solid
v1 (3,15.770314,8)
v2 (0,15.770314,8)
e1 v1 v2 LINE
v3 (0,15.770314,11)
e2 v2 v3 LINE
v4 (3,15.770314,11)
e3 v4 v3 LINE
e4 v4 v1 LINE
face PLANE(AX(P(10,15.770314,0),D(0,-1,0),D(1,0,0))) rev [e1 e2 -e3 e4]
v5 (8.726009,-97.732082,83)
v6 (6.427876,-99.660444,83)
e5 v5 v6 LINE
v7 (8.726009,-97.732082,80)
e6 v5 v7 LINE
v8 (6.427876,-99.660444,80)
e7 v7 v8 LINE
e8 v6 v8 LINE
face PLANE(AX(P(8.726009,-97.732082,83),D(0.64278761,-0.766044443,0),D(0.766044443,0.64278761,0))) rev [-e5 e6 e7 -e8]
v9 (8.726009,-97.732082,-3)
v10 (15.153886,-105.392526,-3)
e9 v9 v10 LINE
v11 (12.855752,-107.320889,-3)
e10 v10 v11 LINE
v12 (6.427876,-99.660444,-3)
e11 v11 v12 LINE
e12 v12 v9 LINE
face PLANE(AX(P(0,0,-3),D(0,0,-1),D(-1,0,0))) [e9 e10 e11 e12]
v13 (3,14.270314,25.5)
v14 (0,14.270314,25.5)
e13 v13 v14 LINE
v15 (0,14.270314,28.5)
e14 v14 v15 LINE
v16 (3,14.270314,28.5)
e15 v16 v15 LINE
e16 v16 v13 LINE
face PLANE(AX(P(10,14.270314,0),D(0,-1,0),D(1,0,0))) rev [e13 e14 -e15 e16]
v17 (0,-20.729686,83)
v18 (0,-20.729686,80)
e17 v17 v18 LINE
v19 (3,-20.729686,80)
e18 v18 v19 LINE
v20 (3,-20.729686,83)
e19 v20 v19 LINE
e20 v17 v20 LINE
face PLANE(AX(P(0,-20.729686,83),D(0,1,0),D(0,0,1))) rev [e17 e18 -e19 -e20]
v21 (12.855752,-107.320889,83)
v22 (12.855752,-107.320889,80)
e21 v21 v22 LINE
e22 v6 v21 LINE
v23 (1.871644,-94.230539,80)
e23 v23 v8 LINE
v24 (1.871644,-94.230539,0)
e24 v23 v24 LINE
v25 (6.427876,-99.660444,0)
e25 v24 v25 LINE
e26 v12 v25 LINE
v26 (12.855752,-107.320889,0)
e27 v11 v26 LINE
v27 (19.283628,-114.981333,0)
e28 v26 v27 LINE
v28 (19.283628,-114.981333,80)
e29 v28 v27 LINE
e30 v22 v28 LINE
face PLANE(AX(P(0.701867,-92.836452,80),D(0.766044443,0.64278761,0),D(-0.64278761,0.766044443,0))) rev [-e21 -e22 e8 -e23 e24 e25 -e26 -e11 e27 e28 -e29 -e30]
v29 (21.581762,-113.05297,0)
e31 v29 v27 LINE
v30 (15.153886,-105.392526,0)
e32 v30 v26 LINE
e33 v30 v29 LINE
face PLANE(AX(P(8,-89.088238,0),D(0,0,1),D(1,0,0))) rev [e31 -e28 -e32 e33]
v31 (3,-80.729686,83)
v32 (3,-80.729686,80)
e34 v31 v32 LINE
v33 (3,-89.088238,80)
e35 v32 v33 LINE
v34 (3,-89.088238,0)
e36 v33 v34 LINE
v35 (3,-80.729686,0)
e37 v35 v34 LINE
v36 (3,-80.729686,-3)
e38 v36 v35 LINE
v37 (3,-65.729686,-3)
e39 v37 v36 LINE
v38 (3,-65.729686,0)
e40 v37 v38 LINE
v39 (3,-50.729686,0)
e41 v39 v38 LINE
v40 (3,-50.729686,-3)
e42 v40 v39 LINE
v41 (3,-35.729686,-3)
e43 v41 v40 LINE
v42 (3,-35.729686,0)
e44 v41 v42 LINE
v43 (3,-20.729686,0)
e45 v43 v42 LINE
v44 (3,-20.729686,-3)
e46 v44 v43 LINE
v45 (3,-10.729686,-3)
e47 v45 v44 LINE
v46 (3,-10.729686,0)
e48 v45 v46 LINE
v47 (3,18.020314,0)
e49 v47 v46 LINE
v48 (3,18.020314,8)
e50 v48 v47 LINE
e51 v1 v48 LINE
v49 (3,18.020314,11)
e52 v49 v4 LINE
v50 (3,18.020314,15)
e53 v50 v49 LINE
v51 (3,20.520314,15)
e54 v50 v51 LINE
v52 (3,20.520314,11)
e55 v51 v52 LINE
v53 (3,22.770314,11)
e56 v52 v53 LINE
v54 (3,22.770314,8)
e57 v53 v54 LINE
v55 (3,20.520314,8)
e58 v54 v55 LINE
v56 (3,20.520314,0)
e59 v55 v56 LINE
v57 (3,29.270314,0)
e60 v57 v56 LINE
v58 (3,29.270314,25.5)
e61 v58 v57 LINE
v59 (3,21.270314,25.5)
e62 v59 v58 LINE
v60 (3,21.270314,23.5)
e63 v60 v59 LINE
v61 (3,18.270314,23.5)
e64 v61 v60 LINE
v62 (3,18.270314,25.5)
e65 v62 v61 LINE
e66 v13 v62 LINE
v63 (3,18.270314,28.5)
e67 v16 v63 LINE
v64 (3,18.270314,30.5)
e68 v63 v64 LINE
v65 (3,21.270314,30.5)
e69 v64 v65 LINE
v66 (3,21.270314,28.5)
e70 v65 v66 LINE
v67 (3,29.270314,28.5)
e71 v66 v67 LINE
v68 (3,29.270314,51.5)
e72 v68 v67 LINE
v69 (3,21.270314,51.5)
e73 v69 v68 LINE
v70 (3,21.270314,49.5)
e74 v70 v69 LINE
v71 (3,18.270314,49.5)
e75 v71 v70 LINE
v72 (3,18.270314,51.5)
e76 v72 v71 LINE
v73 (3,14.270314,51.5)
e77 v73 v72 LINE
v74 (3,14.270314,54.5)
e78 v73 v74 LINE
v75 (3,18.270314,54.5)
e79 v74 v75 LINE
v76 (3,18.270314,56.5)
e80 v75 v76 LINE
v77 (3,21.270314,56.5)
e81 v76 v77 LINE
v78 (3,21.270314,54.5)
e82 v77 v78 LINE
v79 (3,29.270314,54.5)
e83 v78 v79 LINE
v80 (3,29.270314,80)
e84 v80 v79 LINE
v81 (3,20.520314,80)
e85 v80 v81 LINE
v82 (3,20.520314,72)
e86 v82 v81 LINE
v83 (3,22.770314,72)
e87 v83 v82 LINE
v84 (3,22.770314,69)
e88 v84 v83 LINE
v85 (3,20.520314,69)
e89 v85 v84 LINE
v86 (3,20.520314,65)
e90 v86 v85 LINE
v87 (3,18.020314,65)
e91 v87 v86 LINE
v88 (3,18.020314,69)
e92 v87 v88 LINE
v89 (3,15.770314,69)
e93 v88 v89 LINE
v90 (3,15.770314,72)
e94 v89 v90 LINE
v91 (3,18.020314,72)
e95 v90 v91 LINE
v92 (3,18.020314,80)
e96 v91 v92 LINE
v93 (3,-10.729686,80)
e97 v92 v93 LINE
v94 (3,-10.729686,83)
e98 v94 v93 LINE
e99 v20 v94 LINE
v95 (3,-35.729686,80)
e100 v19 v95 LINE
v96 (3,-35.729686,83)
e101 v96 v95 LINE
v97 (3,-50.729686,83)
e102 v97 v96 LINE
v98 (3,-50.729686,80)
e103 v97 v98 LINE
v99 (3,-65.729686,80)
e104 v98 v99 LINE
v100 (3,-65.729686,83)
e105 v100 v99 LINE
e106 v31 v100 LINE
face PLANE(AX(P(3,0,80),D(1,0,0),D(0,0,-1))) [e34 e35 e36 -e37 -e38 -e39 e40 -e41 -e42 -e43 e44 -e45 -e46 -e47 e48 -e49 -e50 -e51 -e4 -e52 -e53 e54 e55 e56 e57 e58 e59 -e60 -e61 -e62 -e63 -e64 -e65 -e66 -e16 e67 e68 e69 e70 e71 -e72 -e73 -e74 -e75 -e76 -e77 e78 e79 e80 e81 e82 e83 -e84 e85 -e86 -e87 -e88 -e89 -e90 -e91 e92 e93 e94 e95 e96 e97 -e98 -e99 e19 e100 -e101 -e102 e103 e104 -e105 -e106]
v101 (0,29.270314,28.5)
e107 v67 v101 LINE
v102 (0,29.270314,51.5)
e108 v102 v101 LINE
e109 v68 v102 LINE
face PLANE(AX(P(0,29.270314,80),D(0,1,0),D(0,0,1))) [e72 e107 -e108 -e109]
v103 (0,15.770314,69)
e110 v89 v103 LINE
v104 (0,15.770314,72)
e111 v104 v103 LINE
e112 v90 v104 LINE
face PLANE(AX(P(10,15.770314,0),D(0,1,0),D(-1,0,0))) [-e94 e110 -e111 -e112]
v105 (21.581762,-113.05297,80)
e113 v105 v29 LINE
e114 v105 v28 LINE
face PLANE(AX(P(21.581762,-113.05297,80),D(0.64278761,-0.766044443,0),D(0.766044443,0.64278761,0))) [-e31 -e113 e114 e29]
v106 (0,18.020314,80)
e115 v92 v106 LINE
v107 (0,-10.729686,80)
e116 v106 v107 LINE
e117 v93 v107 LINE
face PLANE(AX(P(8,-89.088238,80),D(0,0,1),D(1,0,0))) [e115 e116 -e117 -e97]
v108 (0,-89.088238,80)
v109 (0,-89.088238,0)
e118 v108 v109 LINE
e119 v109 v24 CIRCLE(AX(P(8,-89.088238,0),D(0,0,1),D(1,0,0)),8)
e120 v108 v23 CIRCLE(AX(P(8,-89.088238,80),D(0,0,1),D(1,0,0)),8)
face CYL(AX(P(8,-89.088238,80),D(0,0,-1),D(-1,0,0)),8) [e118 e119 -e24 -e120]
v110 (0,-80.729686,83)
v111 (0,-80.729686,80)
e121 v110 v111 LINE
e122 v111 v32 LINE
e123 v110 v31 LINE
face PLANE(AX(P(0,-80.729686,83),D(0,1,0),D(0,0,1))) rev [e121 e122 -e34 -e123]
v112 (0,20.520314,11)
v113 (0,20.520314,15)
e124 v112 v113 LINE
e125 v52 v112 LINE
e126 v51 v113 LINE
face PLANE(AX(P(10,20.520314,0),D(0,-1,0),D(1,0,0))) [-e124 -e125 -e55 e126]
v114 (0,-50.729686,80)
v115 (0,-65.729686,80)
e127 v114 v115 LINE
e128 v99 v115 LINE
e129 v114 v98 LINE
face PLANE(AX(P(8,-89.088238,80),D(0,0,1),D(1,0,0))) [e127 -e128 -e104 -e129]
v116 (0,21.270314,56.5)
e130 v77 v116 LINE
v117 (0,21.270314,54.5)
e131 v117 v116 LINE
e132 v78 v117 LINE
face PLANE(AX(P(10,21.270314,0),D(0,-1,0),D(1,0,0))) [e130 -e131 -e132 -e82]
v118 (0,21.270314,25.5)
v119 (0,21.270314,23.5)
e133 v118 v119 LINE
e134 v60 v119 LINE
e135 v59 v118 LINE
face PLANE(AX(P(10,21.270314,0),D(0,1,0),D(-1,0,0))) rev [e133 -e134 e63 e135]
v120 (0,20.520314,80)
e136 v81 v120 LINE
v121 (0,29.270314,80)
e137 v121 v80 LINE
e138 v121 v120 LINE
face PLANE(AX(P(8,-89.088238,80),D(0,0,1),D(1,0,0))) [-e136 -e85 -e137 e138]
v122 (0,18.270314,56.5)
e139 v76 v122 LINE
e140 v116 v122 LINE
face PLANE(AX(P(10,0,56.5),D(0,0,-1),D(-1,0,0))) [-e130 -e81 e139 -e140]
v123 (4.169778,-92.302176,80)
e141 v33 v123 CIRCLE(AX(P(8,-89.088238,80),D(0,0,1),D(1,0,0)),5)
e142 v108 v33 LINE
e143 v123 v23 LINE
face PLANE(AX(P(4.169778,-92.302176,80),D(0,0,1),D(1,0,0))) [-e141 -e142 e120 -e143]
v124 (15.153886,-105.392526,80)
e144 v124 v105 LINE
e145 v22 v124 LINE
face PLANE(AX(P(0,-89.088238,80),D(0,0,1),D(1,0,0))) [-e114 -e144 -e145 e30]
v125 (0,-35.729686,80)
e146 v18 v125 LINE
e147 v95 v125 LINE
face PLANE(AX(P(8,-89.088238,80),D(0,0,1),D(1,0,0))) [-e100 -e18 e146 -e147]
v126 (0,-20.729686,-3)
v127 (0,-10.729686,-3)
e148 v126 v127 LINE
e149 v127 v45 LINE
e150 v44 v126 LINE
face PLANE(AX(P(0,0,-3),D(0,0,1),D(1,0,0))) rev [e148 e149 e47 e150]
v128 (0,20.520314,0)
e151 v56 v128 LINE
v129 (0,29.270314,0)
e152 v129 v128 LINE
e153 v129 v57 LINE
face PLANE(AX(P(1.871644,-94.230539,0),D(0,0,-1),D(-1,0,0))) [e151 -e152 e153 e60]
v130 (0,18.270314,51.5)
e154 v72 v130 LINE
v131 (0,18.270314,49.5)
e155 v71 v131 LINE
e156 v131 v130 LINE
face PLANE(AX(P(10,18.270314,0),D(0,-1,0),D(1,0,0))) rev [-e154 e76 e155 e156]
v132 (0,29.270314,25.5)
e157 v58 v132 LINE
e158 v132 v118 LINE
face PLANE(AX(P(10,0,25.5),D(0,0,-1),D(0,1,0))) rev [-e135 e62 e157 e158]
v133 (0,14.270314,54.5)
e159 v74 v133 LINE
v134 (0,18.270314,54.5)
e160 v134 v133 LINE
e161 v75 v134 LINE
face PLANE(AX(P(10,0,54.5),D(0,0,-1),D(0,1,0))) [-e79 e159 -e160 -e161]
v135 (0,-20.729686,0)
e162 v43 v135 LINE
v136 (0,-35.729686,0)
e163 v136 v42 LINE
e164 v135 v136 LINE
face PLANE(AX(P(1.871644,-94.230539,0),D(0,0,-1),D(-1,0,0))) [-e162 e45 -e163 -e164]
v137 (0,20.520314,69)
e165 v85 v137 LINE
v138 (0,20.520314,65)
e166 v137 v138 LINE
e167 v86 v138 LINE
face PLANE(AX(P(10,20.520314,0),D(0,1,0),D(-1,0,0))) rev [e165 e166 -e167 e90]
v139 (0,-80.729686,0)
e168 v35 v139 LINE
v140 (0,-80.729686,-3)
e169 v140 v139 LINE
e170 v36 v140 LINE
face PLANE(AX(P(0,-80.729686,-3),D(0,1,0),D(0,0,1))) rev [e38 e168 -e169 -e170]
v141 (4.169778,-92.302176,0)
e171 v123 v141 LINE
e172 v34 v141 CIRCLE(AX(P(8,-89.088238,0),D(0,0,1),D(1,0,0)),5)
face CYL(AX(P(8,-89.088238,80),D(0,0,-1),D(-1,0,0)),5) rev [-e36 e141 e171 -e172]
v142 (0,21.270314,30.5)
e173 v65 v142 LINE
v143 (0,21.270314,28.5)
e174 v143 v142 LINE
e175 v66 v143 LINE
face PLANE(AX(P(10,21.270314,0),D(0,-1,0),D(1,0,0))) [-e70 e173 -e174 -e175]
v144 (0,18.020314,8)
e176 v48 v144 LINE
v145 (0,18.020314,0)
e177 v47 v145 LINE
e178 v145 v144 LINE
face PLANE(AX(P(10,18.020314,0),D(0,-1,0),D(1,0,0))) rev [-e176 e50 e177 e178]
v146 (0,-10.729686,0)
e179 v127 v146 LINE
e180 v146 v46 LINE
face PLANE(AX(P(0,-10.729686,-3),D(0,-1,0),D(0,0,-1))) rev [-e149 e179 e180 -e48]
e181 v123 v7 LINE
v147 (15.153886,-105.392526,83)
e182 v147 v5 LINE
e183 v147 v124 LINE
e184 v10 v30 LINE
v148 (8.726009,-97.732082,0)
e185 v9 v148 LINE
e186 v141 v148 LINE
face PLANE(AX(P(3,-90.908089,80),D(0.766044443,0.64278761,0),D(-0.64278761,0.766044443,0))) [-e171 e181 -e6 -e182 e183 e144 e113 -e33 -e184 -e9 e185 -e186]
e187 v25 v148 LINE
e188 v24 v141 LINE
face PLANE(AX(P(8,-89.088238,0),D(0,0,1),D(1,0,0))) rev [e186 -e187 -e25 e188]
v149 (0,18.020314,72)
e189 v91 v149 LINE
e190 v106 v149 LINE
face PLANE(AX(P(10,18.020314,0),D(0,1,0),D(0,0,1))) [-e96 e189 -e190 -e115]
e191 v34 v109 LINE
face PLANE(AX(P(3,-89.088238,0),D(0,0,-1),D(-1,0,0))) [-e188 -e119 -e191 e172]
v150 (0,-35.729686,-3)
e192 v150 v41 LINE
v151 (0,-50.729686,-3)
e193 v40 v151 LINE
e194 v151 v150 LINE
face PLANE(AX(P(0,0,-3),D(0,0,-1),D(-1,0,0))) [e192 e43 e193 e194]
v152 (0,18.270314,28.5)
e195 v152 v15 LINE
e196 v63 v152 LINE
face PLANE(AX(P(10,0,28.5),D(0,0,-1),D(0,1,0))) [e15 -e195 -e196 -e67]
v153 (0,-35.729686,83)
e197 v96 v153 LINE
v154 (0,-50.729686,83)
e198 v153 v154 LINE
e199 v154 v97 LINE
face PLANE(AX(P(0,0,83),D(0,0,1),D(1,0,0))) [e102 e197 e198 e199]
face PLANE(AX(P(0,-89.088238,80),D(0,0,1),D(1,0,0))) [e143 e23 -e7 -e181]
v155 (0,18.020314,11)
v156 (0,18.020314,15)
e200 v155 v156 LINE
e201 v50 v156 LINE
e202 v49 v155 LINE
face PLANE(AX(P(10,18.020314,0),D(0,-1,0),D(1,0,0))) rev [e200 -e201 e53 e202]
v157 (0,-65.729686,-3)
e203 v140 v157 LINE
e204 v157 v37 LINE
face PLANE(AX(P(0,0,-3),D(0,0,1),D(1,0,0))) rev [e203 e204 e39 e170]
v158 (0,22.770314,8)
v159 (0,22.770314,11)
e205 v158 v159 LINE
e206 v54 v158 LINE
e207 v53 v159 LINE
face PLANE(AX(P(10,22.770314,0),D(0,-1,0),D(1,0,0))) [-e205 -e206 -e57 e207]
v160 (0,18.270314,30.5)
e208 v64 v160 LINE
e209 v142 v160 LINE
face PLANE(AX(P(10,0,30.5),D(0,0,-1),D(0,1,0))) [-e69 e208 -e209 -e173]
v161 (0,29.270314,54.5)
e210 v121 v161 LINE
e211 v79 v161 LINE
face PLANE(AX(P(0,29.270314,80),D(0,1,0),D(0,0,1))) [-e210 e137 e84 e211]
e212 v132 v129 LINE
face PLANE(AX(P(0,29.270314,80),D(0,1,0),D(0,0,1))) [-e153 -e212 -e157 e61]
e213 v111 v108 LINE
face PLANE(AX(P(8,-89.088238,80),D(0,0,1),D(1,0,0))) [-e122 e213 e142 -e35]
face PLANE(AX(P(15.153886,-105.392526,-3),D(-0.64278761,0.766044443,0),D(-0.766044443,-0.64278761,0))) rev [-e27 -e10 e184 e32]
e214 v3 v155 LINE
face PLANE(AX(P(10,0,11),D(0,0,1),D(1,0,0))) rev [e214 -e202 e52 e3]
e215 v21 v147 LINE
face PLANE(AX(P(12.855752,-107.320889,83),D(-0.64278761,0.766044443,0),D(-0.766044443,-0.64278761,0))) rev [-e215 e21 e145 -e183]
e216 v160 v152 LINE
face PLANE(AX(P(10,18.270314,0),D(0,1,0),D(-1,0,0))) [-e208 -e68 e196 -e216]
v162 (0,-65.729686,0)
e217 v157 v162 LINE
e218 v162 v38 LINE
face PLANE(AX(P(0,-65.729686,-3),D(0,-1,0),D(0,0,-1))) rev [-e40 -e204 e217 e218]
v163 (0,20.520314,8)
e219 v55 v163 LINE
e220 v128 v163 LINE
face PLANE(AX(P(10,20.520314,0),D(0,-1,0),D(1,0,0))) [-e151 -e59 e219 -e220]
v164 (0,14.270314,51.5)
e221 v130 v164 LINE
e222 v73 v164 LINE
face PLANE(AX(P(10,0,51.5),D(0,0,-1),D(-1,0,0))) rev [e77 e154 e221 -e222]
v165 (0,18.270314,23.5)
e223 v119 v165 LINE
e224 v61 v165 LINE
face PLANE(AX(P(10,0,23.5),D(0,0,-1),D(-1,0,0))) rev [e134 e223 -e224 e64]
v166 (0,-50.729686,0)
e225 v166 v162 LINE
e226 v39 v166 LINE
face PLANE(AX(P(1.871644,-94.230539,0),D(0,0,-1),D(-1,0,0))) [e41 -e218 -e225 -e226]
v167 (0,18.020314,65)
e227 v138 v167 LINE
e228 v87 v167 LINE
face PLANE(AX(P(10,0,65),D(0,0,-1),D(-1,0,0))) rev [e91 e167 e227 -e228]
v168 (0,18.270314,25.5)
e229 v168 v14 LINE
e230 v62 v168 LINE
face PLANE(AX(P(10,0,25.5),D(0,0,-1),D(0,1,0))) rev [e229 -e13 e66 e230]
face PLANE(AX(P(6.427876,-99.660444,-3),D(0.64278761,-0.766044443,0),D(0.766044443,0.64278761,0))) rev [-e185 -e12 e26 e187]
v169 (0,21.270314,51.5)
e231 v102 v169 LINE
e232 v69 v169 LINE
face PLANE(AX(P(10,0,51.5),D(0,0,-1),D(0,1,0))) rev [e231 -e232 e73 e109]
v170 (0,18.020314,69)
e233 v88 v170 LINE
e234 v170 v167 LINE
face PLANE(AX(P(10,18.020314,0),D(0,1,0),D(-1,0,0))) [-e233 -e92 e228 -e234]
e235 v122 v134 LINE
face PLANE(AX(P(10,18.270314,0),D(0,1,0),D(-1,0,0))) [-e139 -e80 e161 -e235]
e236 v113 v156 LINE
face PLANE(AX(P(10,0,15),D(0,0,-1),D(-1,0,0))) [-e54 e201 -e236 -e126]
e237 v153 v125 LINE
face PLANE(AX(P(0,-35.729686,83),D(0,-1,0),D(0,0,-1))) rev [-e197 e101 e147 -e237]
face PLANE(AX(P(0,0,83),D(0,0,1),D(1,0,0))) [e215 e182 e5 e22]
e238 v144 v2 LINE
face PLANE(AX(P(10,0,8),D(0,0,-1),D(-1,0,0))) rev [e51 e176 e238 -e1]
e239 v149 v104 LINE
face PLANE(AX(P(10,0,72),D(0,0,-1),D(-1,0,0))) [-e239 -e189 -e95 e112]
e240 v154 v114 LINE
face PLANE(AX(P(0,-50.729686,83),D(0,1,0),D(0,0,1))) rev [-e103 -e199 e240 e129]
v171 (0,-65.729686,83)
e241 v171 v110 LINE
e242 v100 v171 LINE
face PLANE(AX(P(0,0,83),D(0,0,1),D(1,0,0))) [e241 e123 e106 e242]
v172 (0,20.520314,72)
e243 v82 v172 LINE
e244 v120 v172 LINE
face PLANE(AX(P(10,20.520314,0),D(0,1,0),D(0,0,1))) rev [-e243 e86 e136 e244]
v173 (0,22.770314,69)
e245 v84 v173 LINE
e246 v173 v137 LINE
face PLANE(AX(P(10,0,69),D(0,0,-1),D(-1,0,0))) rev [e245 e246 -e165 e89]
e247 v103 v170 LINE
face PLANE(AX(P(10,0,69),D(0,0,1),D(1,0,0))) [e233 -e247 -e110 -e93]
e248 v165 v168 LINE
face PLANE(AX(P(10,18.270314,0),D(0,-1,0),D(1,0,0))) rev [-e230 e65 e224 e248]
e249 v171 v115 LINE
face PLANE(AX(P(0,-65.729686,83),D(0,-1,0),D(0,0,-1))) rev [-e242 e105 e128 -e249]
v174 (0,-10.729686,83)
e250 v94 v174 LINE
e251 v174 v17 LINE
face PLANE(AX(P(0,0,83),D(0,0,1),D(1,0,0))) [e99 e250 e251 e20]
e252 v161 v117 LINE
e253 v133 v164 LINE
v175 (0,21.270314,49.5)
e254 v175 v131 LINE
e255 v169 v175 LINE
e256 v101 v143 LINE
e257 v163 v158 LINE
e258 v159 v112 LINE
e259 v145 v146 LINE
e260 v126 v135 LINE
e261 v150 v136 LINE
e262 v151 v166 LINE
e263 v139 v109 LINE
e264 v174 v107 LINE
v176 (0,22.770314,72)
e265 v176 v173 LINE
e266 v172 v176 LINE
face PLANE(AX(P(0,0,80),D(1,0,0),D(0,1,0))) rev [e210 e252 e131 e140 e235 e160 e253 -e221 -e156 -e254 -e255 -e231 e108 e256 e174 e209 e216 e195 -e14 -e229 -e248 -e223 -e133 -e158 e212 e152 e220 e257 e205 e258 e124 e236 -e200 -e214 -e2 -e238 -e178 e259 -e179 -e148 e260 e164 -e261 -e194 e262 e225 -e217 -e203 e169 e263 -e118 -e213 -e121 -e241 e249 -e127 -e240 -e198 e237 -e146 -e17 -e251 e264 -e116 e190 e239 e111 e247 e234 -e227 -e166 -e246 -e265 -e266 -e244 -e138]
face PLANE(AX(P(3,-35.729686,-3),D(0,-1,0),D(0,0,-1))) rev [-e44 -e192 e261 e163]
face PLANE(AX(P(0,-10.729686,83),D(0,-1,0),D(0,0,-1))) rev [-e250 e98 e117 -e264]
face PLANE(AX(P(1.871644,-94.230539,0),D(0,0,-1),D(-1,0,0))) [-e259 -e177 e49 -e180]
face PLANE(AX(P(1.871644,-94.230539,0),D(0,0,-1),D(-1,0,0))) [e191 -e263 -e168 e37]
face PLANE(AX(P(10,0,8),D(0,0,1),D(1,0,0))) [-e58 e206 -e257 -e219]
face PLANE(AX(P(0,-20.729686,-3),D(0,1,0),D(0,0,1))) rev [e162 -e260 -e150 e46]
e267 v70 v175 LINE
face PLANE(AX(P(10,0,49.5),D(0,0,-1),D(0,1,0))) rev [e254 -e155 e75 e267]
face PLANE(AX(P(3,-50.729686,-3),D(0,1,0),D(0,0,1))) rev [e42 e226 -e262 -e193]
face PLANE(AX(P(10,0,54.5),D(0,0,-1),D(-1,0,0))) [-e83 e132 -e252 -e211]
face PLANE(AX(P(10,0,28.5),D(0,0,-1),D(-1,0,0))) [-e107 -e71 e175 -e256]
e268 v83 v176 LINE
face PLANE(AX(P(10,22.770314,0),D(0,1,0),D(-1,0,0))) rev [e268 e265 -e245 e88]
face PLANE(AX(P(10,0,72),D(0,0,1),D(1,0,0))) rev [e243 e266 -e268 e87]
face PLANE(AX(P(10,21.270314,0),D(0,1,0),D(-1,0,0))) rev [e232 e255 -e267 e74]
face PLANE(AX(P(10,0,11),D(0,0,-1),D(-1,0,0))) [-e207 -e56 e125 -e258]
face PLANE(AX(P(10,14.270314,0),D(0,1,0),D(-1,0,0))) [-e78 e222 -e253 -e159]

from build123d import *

# Parameters (mm, degrees)
BRIDA_BASE1_DEPTH       = 80
CROQUIS13_W             = 3
CROQUIS13_H             = 10
CROQUIS13_H_2           = 15
SALIENTE_EXTRUIR2_DEPTH = 3
CROQUIS14_W             = 3
CROQUIS14_H             = 10
CROQUIS14_H_2           = 15
SALIENTE_EXTRUIR3_DEPTH = 3
CORTAR_EXTRUIR1_DEPTH   = 10


# Sheet-metal steps are written as plain solids
with BuildPart() as part:
    # Croquis7 → Brida base1 (new body)
    with BuildSketch(Plane.XY):
        with BuildLine():
            Line((3, 29.270313854), (3, 0))
            Line((3, 0), (3, -89.088238126))
            ThreePointArc((3, -89.088238126), (3.301536896, -90.798338842), (4.169777784, -92.302176174))
            Line((4.169777784, -92.302176174), (21.58176162, -113.052970465))
            Line((21.58176162, -113.052970465), (19.283628291, -114.981333294))
            Line((19.283628291, -114.981333294), (1.871644455, -94.230539003))
            ThreePointArc((1.871644455, -94.230539003), (0.482459034, -91.824399272), (0, -89.088238126))
            Line((0, -89.088238126), (0, 0))
            Line((0, 0), (0, 29.270313854))
            Line((0, 29.270313854), (3, 29.270313854))
        make_face()
    extrude(amount=BRIDA_BASE1_DEPTH)

    # Croquis13 → Saliente-Extruir2 (add)
    with BuildSketch(Plane.XY.offset(80)):
        with Locations((1.5, -15.729686146)):
            Rectangle(CROQUIS13_W, CROQUIS13_H)
        Polygon((12.855752194, -107.320888862), (15.153885523, -105.392526033), (8.726009426, -97.732081602), (6.427876097, -99.660444431), align=None)
        with Locations((1.5, -43.229686146)):
            Rectangle(CROQUIS13_W, CROQUIS13_H_2)
        with Locations((1.5, -73.229686146)):
            Rectangle(CROQUIS13_W, CROQUIS13_H_2)
    extrude(amount=SALIENTE_EXTRUIR2_DEPTH)

    # Croquis14 → Saliente-Extruir3 (add)
    with BuildSketch(Plane(origin=(0, 0, 0), x_dir=(-1, 0, 0), z_dir=(0, 0, -1))):
        with Locations((-1.5, -15.729686146)):
            Rectangle(CROQUIS14_W, CROQUIS14_H)
        Polygon((-15.153885523, -105.392526033), (-12.855752194, -107.320888862), (-6.427876097, -99.660444431), (-8.726009426, -97.732081602), align=None)
        with Locations((-1.5, -43.229686146)):
            Rectangle(CROQUIS14_W, CROQUIS14_H_2)
        with Locations((-1.5, -73.229686146)):
            Rectangle(CROQUIS14_W, CROQUIS14_H_2)
    extrude(amount=SALIENTE_EXTRUIR3_DEPTH)

    # Croquis15 → Cortar-Extruir1 (cut)
    with BuildSketch(Plane.ZY):
        Polygon((8, 20.520313854), (0, 20.520313854), (0, 18.020313854), (8, 18.020313854), (8, 15.770313854), (11, 15.770313854), (11, 18.020313854), (15, 18.020313854), (15, 20.520313854), (11, 20.520313854), (11, 22.770313854), (8, 22.770313854), align=None)
        Polygon((80, 18.020313854), (80, 20.520313854), (72, 20.520313854), (72, 22.770313854), (69, 22.770313854), (69, 20.520313854), (65, 20.520313854), (65, 18.020313854), (69, 18.020313854), (69, 15.770313854), (72, 15.770313854), (72, 18.020313854), align=None)
        Polygon((54.5, 29.270313854), (51.5, 29.270313854), (51.5, 21.270313854), (49.5, 21.270313854), (49.5, 18.270313854), (51.5, 18.270313854), (51.5, 14.270313854), (54.5, 14.270313854), (54.5, 18.270313854), (56.5, 18.270313854), (56.5, 21.270313854), (54.5, 21.270313854), align=None)
        Polygon((28.5, 29.270313854), (25.5, 29.270313854), (25.5, 21.270313854), (23.5, 21.270313854), (23.5, 18.270313854), (25.5, 18.270313854), (25.5, 14.270313854), (28.5, 14.270313854), (28.5, 18.270313854), (30.5, 18.270313854), (30.5, 21.270313854), (28.5, 21.270313854), align=None)
    extrude(amount=-CORTAR_EXTRUIR1_DEPTH, mode=Mode.SUBTRACT)


solid = part.part
